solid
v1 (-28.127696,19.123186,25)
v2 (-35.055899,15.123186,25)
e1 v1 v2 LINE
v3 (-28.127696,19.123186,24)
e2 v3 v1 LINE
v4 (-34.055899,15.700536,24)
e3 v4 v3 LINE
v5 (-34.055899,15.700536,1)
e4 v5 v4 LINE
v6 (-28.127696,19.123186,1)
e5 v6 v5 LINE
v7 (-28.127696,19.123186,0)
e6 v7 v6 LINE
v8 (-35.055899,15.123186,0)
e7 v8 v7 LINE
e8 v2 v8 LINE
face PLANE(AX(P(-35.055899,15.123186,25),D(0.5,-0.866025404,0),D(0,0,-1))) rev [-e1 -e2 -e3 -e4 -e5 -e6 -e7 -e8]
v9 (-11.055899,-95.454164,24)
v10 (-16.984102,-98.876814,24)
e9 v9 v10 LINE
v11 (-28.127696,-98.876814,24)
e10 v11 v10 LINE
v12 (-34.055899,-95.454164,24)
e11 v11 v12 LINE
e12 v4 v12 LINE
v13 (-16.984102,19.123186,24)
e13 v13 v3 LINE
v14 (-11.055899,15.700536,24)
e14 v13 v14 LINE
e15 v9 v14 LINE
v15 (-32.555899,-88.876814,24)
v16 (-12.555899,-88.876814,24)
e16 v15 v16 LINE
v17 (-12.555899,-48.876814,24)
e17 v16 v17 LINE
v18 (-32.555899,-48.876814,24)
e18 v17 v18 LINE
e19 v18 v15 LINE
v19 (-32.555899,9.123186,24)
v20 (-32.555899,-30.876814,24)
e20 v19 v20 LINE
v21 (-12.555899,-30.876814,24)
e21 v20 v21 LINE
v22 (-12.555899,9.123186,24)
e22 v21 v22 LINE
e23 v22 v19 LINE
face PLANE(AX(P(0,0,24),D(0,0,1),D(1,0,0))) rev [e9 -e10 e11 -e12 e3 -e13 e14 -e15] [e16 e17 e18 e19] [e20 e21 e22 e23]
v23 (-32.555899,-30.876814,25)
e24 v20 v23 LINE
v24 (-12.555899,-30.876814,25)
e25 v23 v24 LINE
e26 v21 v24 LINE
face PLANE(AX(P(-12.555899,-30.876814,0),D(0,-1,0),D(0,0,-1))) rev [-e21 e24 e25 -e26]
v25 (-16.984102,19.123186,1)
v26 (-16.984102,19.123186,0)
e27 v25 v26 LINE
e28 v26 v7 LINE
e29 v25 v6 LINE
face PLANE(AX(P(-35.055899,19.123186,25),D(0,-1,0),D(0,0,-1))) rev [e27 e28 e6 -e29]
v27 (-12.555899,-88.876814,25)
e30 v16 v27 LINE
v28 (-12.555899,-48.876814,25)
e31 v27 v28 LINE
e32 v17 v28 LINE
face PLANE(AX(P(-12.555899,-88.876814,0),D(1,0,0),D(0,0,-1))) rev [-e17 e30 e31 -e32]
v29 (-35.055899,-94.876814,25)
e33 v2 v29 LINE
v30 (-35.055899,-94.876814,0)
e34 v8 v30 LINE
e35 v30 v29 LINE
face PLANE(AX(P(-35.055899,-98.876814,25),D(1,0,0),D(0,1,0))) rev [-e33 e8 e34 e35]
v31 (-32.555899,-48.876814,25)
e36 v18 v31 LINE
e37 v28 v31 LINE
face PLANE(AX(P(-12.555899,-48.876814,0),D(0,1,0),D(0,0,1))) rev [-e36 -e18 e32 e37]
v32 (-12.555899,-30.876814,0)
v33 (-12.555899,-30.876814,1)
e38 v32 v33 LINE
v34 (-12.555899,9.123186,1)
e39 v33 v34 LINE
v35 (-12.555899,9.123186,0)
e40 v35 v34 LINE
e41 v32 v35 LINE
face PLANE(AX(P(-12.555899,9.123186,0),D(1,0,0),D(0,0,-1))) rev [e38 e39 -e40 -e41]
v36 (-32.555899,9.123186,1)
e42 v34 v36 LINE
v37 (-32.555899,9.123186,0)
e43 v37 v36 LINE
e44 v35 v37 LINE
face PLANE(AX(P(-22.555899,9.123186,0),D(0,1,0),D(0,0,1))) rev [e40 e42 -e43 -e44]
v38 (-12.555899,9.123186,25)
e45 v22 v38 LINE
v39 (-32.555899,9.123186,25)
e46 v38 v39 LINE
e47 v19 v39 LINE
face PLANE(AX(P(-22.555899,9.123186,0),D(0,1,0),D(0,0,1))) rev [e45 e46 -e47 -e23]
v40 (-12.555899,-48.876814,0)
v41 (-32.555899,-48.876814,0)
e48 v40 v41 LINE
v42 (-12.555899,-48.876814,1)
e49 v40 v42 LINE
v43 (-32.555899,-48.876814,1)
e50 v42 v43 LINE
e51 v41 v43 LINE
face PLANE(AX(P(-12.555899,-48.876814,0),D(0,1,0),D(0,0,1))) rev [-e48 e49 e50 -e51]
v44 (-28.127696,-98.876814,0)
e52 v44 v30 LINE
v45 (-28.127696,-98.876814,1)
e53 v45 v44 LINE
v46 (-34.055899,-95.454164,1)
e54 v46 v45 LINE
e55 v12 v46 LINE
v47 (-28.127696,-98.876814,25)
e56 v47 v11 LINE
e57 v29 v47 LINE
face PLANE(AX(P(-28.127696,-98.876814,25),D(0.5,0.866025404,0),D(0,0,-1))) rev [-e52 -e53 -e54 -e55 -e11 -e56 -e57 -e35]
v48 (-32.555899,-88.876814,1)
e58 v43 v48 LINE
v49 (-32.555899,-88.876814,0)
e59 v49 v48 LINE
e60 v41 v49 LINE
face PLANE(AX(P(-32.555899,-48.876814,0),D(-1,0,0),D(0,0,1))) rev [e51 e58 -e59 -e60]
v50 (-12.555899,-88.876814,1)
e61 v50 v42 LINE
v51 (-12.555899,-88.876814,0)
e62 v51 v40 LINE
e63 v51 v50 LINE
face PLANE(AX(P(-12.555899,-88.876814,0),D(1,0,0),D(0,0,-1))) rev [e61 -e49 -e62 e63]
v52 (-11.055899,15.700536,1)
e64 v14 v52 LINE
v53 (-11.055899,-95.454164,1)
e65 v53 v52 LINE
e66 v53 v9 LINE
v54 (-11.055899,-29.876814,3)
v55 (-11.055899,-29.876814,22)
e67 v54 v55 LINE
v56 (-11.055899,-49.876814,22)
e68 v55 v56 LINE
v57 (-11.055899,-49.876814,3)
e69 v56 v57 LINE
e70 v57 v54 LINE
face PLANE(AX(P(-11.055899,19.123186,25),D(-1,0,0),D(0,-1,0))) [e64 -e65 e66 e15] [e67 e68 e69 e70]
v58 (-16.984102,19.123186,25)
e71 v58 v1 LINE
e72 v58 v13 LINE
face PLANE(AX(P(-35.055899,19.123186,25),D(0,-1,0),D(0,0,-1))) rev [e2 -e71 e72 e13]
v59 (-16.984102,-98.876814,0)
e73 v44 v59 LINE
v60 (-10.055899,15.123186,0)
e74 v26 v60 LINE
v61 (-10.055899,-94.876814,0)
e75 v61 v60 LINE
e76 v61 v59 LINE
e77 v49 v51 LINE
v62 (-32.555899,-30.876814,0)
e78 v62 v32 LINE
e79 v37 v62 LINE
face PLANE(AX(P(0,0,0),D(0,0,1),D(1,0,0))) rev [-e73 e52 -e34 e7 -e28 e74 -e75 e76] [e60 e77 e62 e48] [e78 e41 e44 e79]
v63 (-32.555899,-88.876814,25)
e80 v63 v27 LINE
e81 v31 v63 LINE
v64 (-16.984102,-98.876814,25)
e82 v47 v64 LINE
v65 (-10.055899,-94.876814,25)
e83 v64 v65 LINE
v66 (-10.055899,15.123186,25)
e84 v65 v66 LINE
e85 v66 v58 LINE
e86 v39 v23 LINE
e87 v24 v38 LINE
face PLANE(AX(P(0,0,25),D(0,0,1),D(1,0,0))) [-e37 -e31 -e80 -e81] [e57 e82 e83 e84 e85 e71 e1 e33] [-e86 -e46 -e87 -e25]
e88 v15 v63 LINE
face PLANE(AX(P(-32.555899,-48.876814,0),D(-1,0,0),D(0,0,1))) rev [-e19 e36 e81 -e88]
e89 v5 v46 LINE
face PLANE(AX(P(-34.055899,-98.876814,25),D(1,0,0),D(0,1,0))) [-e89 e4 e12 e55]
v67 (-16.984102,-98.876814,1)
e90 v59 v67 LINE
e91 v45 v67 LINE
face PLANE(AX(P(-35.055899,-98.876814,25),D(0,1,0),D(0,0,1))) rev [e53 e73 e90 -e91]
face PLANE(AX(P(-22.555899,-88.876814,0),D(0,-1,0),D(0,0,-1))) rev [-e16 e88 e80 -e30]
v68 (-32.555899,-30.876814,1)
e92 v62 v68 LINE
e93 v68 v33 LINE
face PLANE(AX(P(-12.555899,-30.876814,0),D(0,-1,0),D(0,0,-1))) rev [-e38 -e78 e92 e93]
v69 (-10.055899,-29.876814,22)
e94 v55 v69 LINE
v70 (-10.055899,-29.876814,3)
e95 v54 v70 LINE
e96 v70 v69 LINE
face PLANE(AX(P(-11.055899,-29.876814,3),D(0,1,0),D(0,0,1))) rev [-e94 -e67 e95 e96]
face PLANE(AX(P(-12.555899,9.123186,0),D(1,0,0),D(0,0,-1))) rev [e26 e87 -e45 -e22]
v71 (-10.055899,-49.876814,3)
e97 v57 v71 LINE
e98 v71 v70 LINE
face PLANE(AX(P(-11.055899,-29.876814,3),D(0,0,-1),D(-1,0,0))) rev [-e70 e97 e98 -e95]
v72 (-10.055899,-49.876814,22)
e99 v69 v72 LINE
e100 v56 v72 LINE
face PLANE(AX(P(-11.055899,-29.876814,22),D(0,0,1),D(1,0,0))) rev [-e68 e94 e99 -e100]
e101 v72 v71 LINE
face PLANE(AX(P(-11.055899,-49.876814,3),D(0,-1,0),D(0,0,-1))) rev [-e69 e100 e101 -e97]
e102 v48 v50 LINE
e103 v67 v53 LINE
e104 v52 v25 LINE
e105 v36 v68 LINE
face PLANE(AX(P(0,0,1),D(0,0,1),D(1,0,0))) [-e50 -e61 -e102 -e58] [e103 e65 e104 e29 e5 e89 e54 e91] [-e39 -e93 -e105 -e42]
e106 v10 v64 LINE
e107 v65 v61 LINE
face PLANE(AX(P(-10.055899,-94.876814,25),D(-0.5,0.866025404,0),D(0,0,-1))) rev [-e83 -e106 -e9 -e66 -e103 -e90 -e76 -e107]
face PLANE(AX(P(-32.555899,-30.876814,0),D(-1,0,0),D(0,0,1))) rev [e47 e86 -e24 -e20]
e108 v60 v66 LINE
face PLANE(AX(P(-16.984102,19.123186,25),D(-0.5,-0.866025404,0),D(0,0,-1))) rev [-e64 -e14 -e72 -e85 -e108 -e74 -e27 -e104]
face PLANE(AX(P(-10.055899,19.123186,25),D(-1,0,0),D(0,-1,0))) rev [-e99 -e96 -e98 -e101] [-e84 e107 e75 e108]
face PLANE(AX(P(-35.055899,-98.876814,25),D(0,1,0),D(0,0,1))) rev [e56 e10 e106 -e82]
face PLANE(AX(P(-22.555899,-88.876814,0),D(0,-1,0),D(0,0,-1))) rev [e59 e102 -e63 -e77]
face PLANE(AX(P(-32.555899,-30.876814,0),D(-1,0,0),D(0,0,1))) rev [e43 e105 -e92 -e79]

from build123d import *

# Parameters (mm, degrees)
CROQUIS1_W              = 25
CROQUIS1_H              = 118
SALIENTE_EXTRUIR1_DEPTH = 25
VACIADO1_T              = -1
CORTAR_EXTRUIR2_DEPTH   = 25
CROQUIS3_W              = 19
CROQUIS3_H              = 20
CORTAR_EXTRUIR3_DEPTH   = 1
CHAFL_N1_SIZE           = 4
CHAFL_N1_SIZE_2         = 6.92820323
CHAFL_N2_SIZE           = 6.92820323
CHAFL_N2_SIZE_2         = 4


with BuildPart() as part:
    # Croquis1 → Saliente-Extruir1 (new body)
    with BuildSketch(Plane.XY):
        with Locations((-22.555898832, -39.876814203)):
            Rectangle(CROQUIS1_W, CROQUIS1_H)
    extrude(amount=SALIENTE_EXTRUIR1_DEPTH)

    # Vaciado1
    vaciado1_openings = [part.faces().sort_by_distance(p)[0] for p in [
        (-22.555898832, -98.876814203, 12.5),
        (-22.555898832, 19.123185797, 12.5),
    ]]
    offset(amount=VACIADO1_T, openings=vaciado1_openings, kind=Kind.INTERSECTION)

    # Croquis2 → Cortar-Extruir2 (cut)
    with BuildSketch(Plane.XY.offset(25)):
        Polygon((-12.555898832, -30.876814203), (-32.555898832, -30.876814203), (-32.555898832, 9.123185797), (-22.555898832, 9.123185797), (-12.555898832, 9.123185797), align=None)
        Polygon((-12.555898832, -88.876814203), (-12.555898832, -48.876814203), (-32.555898832, -48.876814203), (-32.555898832, -88.876814203), (-22.555898832, -88.876814203), align=None)
    extrude(amount=-CORTAR_EXTRUIR2_DEPTH, mode=Mode.SUBTRACT)

    # Croquis3 → Cortar-Extruir3 (cut)
    with BuildSketch(Plane(origin=(-10.055898832, 0, 0), x_dir=(0, 0, -1), z_dir=(1, 0, 0))):
        with Locations((-12.5, -39.876814203)):
            Rectangle(CROQUIS3_W, CROQUIS3_H)
    extrude(amount=-CORTAR_EXTRUIR3_DEPTH, mode=Mode.SUBTRACT)

    # Chaflán1
    # the kernel refuses this chamfer: 6.92820323, 4 mm, written as the material it takes off along each edge
    with BuildSketch(Plane(origin=(-35.055898832, 19.123185797, -17.923855882), x_dir=(0, -1, 0), z_dir=(0, 0, 1))) as chafl_n1_piece_1:
        Polygon((CHAFL_N1_SIZE, 0), (0, CHAFL_N1_SIZE_2), (0, 0), align=None)
    extrude(amount=60.847711765, mode=Mode.SUBTRACT)
    with BuildSketch(Plane(origin=(-10.055898832, 19.123185797, -17.923855882), x_dir=(-1, 0, 0), z_dir=(0, 0, 1))) as chafl_n1_piece_2:
        Polygon((CHAFL_N1_SIZE_2, 0), (0, CHAFL_N1_SIZE), (0, 0), align=None)
    extrude(amount=60.847711765, mode=Mode.SUBTRACT)

    # Chaflán2
    # the kernel refuses this chamfer: 6.92820323, 4 mm, written as the material it takes off along each edge
    with BuildSketch(Plane(origin=(-10.055898832, -98.876814203, -17.923855882), x_dir=(-1, 0, 0), z_dir=(0, 0, 1))) as chafl_n2_piece_1:
        Polygon((CHAFL_N2_SIZE, 0), (0, -CHAFL_N2_SIZE_2), (0, 0), align=None)
    extrude(amount=60.847711765, mode=Mode.SUBTRACT)
    with BuildSketch(Plane(origin=(-35.055898832, -98.876814203, -17.923855882), x_dir=(0, 1, 0), z_dir=(0, 0, 1))) as chafl_n2_piece_2:
        Polygon((CHAFL_N2_SIZE_2, 0), (0, -CHAFL_N2_SIZE), (0, 0), align=None)
    extrude(amount=60.847711765, mode=Mode.SUBTRACT)


solid = part.part
